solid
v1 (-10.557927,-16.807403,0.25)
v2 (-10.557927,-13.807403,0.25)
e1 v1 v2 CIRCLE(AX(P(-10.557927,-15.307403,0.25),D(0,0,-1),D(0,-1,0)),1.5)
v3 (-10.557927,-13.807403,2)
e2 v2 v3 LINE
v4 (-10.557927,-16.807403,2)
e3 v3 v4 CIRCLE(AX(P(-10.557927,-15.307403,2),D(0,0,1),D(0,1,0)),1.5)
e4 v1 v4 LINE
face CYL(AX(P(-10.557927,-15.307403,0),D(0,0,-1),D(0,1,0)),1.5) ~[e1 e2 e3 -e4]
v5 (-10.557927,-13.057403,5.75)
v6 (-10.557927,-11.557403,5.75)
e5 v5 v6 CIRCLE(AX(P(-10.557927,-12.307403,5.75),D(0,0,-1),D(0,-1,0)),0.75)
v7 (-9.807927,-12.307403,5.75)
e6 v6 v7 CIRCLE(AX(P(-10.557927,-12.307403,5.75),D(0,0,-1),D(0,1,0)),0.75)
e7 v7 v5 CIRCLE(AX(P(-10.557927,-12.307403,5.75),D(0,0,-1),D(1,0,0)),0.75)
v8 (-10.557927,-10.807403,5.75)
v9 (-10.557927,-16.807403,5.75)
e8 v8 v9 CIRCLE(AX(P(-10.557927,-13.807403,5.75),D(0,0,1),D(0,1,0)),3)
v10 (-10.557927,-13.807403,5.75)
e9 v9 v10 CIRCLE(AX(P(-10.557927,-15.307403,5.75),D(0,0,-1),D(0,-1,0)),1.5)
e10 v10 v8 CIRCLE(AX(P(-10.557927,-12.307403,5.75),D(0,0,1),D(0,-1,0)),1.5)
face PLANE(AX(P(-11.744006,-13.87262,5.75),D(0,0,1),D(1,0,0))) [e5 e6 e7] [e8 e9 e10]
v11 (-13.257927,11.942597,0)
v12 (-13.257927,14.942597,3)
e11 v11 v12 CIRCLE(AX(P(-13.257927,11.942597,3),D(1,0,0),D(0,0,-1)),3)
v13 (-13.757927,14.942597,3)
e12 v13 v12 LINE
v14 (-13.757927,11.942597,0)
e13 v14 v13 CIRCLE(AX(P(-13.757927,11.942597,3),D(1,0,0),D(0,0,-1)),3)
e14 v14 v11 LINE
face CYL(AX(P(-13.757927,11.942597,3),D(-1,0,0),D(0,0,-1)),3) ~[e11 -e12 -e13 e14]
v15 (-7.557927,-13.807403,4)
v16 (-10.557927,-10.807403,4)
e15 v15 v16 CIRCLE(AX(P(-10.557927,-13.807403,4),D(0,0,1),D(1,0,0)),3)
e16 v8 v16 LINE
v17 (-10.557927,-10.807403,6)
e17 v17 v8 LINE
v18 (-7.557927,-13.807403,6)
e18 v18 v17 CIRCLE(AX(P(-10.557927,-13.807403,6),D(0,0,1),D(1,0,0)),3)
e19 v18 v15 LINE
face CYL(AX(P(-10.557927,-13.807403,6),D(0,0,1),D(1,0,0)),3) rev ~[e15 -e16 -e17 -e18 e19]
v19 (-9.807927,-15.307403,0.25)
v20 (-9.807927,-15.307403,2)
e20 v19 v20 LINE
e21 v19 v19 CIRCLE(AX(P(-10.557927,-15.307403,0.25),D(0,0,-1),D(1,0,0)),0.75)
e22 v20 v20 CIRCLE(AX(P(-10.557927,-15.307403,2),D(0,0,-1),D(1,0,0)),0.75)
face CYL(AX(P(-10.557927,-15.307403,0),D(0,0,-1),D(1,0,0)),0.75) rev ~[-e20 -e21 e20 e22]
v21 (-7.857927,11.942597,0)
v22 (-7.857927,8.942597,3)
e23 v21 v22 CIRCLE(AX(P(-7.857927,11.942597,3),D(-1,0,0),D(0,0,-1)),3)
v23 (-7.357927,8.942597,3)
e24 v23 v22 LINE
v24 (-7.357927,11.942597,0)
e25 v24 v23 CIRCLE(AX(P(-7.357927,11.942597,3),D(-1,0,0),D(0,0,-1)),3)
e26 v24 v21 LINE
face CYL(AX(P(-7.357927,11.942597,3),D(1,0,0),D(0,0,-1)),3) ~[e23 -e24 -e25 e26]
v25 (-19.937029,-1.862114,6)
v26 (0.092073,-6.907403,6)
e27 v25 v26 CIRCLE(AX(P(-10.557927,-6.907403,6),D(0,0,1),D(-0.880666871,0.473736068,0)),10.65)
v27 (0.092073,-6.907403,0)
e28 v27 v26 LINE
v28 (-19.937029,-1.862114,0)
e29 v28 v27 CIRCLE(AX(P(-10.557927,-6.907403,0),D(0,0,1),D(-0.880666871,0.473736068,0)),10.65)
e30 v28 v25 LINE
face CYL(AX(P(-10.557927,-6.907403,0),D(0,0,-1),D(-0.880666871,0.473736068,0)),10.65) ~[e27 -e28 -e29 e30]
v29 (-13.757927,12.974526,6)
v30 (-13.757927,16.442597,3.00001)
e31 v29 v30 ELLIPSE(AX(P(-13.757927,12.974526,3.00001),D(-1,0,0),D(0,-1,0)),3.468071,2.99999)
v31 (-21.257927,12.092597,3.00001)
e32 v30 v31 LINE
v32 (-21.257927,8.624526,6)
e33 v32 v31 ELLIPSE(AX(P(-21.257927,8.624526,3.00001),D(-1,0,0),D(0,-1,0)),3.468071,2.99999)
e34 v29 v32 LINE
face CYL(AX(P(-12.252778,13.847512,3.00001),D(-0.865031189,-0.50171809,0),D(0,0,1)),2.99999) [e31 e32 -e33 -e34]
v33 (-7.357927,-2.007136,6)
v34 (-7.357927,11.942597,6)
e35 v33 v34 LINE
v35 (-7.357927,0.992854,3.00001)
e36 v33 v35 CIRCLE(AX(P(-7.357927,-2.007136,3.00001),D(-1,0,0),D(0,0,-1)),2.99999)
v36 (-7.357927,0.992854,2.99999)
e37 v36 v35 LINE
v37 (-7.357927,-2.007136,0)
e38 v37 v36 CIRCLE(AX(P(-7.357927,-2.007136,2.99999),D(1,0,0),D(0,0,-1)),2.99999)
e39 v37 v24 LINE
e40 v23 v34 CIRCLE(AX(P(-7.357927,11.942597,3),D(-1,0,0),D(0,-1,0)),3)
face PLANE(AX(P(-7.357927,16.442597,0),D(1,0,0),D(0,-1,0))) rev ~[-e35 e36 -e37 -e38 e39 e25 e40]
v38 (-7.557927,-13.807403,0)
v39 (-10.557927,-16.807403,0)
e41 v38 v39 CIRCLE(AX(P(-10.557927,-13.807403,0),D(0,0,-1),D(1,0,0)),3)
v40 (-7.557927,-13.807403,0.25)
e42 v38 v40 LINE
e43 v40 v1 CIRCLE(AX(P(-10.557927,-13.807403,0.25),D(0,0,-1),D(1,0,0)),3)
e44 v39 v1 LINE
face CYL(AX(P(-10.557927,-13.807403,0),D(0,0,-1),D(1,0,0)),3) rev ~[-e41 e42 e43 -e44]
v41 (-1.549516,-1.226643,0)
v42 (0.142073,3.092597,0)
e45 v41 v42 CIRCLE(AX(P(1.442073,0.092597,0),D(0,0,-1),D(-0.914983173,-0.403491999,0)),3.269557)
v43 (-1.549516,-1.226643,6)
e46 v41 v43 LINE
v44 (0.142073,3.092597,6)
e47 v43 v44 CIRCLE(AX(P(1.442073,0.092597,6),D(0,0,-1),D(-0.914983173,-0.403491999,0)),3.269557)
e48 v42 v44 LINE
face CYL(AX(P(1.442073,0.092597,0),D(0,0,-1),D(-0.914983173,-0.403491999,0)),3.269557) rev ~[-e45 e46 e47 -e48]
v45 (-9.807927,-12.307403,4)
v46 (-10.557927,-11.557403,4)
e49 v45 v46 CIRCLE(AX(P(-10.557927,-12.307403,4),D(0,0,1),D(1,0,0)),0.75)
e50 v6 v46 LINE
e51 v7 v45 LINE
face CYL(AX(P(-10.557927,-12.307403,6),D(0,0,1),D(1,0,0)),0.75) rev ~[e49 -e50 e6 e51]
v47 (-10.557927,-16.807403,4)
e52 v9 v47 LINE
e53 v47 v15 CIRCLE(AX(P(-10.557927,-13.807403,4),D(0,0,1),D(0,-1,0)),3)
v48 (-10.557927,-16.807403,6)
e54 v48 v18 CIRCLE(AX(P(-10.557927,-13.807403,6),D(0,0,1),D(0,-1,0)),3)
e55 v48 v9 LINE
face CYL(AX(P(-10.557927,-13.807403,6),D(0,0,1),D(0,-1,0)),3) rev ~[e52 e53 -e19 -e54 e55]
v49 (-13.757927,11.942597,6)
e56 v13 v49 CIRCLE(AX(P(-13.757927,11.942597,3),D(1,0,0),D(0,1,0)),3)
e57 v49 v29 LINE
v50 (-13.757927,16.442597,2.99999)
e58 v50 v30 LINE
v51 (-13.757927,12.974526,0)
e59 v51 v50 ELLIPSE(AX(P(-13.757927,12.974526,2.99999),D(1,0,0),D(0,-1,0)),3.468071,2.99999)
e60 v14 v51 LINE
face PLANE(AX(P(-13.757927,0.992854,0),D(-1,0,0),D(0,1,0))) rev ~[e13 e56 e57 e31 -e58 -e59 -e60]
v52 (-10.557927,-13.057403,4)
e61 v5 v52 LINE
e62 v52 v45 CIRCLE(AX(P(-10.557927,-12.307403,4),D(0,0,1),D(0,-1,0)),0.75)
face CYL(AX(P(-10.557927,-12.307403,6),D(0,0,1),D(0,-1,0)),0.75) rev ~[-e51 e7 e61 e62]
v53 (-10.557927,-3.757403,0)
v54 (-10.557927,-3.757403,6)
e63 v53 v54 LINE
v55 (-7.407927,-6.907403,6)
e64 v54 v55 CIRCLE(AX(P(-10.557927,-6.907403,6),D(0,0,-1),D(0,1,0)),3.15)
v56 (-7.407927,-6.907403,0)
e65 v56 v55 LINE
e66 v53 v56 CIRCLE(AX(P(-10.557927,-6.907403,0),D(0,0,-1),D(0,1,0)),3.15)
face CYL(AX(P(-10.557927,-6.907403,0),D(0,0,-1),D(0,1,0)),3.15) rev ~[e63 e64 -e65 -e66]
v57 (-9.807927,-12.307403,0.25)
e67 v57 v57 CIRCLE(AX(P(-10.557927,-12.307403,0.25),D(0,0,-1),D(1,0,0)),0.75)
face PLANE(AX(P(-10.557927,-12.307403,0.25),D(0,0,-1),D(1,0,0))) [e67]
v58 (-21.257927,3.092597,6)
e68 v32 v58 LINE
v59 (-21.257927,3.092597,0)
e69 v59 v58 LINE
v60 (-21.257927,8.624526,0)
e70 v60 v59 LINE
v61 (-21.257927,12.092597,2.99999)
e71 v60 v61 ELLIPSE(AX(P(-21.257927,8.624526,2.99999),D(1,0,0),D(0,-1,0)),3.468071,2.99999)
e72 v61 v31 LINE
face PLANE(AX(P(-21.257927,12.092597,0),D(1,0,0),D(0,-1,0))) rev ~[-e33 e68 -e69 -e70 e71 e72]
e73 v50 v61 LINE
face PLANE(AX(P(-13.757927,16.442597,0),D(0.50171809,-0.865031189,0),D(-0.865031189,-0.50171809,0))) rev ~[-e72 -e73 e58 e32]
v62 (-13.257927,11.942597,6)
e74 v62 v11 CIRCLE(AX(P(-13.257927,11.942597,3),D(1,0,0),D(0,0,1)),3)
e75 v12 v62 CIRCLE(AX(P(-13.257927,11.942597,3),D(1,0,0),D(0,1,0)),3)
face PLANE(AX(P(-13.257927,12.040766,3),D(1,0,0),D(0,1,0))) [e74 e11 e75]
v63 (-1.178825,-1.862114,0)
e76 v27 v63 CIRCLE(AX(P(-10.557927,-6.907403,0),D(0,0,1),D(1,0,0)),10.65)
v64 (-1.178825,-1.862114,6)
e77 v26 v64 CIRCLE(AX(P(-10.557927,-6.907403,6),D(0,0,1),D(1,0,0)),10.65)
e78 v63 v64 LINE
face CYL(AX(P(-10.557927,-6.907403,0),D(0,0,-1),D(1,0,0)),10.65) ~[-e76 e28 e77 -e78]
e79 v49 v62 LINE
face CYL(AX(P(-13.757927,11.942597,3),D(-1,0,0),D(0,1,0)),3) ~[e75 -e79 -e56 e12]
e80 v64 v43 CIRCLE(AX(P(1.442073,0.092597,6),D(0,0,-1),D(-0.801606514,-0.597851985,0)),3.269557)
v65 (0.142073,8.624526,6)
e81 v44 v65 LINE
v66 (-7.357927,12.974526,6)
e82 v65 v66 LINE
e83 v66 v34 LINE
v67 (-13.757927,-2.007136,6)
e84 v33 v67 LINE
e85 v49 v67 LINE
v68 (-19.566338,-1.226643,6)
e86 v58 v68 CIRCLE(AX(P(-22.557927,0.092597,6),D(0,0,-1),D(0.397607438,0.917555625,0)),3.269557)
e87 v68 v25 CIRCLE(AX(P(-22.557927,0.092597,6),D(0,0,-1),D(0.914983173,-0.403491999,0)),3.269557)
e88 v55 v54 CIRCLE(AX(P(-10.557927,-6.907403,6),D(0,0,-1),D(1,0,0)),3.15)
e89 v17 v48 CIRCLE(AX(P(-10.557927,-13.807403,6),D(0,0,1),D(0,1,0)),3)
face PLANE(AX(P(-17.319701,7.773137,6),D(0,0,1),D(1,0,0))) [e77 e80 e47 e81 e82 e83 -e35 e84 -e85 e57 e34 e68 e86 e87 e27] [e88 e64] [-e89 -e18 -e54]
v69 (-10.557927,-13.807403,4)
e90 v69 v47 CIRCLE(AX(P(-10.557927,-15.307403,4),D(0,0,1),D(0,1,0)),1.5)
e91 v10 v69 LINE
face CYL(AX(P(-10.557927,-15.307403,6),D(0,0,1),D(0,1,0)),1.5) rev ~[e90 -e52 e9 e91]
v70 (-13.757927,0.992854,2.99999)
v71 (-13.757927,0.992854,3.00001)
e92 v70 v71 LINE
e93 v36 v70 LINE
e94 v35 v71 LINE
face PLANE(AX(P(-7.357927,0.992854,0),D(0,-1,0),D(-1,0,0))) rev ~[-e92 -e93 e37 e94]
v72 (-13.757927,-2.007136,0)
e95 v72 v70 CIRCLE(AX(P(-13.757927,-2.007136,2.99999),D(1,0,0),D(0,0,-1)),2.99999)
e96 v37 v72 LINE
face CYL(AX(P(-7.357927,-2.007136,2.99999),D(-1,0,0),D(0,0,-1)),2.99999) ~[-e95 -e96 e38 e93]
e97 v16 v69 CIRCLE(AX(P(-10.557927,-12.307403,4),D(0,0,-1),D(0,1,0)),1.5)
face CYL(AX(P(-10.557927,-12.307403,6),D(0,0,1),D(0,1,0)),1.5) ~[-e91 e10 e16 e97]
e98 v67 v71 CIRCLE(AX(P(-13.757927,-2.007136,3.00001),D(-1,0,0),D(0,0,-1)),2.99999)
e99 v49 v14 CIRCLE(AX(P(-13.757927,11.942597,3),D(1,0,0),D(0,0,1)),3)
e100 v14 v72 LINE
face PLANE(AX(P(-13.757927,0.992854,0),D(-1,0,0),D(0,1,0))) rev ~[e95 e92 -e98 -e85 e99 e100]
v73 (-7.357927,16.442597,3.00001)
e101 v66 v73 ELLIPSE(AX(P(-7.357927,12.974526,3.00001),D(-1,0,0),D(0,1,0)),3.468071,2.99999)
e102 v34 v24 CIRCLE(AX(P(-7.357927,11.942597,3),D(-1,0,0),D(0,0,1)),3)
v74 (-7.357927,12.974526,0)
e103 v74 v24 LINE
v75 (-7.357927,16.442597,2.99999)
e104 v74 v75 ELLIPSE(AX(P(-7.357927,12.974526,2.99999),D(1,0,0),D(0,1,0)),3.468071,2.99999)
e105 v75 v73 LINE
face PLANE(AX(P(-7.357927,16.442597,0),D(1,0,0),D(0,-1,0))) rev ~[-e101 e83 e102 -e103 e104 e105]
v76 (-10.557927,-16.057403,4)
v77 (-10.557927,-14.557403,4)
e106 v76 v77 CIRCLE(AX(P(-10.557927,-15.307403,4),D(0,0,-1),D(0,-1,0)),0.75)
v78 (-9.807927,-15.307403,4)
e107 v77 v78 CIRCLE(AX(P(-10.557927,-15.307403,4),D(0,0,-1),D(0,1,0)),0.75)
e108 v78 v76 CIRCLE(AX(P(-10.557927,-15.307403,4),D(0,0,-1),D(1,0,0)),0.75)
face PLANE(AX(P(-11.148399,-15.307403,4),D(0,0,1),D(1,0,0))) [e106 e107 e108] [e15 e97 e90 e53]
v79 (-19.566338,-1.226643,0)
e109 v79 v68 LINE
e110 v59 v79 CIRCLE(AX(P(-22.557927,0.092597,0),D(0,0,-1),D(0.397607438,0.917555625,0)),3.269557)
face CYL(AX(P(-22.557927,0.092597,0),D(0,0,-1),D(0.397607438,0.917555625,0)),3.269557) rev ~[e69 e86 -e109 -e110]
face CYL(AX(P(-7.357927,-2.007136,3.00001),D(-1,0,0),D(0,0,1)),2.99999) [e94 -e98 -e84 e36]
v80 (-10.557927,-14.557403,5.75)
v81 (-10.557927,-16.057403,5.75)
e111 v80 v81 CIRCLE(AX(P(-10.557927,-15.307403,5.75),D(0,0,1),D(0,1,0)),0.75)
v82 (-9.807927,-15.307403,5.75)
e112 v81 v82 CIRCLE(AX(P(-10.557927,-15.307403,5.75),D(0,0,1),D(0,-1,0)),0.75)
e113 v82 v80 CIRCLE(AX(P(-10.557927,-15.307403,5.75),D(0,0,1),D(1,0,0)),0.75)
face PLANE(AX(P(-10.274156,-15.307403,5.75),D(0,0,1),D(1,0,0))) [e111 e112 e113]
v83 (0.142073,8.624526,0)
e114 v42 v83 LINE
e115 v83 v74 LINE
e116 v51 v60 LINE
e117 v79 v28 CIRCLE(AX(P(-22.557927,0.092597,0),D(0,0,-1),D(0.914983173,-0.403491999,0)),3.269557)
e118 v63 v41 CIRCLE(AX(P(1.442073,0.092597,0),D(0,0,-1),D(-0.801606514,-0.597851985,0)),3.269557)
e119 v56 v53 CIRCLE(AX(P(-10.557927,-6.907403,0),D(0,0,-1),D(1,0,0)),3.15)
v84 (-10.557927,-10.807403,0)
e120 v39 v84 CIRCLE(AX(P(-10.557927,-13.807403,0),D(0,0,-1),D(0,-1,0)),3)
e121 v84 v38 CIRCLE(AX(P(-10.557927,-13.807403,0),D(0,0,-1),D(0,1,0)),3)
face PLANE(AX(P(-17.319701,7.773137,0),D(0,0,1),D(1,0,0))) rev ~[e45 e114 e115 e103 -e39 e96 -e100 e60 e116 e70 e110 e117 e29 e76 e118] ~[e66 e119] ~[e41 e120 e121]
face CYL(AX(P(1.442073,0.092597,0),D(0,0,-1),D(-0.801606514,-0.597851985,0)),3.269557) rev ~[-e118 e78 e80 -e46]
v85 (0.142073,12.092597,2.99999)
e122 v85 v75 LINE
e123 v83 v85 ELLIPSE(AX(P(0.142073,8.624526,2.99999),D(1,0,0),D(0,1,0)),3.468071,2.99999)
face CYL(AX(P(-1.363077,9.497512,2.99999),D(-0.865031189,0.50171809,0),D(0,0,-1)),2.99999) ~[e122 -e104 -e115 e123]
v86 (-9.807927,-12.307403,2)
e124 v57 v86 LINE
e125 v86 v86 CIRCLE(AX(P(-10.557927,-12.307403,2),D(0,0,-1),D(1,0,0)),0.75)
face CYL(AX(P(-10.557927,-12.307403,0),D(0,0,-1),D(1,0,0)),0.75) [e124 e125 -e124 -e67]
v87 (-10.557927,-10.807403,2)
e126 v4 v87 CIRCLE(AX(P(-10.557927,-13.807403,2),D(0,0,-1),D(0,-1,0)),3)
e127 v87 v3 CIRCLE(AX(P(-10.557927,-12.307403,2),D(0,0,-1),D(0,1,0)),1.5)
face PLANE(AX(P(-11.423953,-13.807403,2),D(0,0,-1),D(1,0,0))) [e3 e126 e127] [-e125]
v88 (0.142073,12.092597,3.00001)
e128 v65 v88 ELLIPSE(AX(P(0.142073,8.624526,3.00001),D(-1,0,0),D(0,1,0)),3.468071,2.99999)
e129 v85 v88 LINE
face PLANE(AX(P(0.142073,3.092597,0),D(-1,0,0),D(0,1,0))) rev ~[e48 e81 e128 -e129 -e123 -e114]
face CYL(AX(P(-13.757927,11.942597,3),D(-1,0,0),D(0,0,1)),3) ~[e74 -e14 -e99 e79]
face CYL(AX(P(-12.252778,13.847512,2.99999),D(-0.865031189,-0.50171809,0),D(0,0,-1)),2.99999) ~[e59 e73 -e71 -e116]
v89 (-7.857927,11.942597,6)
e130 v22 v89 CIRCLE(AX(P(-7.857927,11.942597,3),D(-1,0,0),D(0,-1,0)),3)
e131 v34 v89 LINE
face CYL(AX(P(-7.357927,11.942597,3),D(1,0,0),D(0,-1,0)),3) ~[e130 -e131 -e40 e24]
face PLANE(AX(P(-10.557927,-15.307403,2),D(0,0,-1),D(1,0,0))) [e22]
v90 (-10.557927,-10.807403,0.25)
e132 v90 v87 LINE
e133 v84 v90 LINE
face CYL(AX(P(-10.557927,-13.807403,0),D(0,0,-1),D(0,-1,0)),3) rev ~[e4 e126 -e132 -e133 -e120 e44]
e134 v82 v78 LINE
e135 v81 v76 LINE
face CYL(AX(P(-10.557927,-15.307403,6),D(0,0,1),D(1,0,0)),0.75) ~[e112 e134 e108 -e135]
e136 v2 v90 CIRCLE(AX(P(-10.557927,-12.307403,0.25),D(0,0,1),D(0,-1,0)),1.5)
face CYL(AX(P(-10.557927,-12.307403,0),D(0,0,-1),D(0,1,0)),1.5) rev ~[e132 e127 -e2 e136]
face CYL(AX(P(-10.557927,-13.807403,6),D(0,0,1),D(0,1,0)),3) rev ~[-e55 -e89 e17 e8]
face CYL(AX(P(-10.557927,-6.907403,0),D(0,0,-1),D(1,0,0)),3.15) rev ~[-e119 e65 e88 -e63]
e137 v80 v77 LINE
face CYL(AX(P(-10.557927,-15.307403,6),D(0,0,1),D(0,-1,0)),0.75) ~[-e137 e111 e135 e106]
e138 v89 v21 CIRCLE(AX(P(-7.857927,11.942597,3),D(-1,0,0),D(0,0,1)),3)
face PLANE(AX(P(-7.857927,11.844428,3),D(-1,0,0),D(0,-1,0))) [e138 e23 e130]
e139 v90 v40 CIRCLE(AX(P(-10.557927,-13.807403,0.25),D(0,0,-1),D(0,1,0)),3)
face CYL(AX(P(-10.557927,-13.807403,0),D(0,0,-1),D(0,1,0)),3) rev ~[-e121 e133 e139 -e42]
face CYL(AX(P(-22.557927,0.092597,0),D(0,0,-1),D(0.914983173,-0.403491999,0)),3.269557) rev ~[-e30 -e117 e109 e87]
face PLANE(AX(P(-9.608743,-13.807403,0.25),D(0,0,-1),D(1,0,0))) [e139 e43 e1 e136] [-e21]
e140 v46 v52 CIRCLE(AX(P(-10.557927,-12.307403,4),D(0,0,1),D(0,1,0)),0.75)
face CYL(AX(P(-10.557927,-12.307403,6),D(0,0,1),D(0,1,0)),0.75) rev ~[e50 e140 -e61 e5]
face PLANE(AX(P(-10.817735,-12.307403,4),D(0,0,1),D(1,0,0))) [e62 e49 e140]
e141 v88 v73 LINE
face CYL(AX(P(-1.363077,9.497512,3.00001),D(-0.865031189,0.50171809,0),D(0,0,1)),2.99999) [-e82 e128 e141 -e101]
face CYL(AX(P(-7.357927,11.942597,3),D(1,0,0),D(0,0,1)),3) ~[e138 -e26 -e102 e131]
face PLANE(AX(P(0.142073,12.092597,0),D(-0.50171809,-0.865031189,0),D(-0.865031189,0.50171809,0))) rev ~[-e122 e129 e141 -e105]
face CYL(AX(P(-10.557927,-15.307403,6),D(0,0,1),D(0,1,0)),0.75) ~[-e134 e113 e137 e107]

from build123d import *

# Parameters (mm, degrees)
F1_DEPTH  = 6
F3_DEPTH  = 0.5
F5_DEPTH  = 0.5
F6_R      = 2.99999
F7_R      = 2.99999
F9_DEPTH  = 2
F10_DEPTH = 0.25
F11_R     = 0.75
F12_DEPTH = 2
F13_DEPTH = 0.25


# Not quite as in the source:
# - a fillet or chamfer is up to 0.001 mm smaller than in the source, because OpenCascade refuses the exact size


with BuildPart() as f1:
    # F0 (on Top) → F1 (new body)
    with BuildSketch(Plane.XY):
        with BuildLine():
            ThreePointArc((-21.257927263, 3.0925971456), (-19.5135237331, 1.2849088277), (-19.5663380414, -1.2266427602))
            ThreePointArc((-19.5663380414, -1.2266427602), (-17.0596555887, 1.5276447909), (-13.757927263, 3.2504758611))
            Line((-13.757927263, 3.2504758611), (-13.757927263, 16.4425971456))
            Line((-13.757927263, 16.4425971456), (-21.257927263, 12.0925971456))
            Line((-21.257927263, 12.0925971456), (-21.257927263, 3.0925971456))
        make_face()
        with BuildLine():
            ThreePointArc((-19.937029438, -1.8621137259), (-13.1593751133, -17.2347921219), (0.092072737, -6.9074028544))
            ThreePointArc((0.092072737, -6.9074028544), (-0.2305379955, -4.3059550041), (-1.178825088, -1.8621137259))
            ThreePointArc((-1.178825088, -1.8621137259), (-1.3821012217, -1.5548376637), (-1.5495164847, -1.2266427602))
            ThreePointArc((-1.5495164847, -1.2266427602), (-4.0561989374, 1.5276447909), (-7.357927263, 3.2504758611))
            Line((-7.357927263, 3.2504758611), (-7.357927263, 1.1925971456))
            Line((-7.357927263, 1.1925971456), (-7.357927263, 0.9928541258))
            Line((-7.357927263, 0.9928541258), (-10.557927263, 0.9928541258))
            Line((-10.557927263, 0.9928541258), (-13.757927263, 0.9928541258))
            Line((-13.757927263, 0.9928541258), (-13.757927263, 1.1925971456))
            Line((-13.757927263, 1.1925971456), (-13.757927263, 3.2504758611))
            ThreePointArc((-13.757927263, 3.2504758611), (-17.0596555887, 1.5276447909), (-19.5663380414, -1.2266427602))
            ThreePointArc((-19.5663380414, -1.2266427602), (-19.7337533043, -1.5548376637), (-19.937029438, -1.8621137259))
        make_face()
        with BuildLine():
            ThreePointArc((-7.407927263, -6.9074028544), (-12.7853136237, -9.1347892152), (-10.557927263, -3.7574028544))
            ThreePointArc((-10.557927263, -3.7574028544), (-8.3305409023, -4.6800164937), (-7.407927263, -6.9074028544))
        make_face(mode=Mode.SUBTRACT)
        with BuildLine():
            ThreePointArc((-7.357927263, 3.2504758611), (-4.0561989374, 1.5276447909), (-1.5495164847, -1.2266427602))
            ThreePointArc((-1.5495164847, -1.2266427602), (-1.6023307929, 1.2849088277), (0.142072737, 3.0925971456))
            Line((0.142072737, 3.0925971456), (0.142072737, 12.0925971456))
            Line((0.142072737, 12.0925971456), (-7.357927263, 16.4425971456))
            Line((-7.357927263, 16.4425971456), (-7.357927263, 3.2504758611))
        make_face()
    extrude(amount=F1_DEPTH)

    # F2 (on face) → F3 (join)
    with BuildSketch(Plane.YZ.offset(-13.757927263)):
        with BuildLine():
            ThreePointArc((11.9425971456, 0), (14.0639174891, 0.8786796564), (14.9425971456, 3))
            ThreePointArc((14.9425971456, 3), (14.0639174891, 5.1213203436), (11.9425971456, 6))
            ThreePointArc((11.9425971456, 6), (8.9425971456, 3), (11.9425971456, 0))
        make_face()
    extrude(amount=F3_DEPTH)

    # F4 (on face) → F5 (join)
    with BuildSketch(Plane(origin=(-7.357927263, 0, 0), x_dir=(0, -1, 0), z_dir=(-1, 0, 0))):
        with BuildLine():
            ThreePointArc((-11.9425971456, 0), (-9.821276802, 0.8786796564), (-8.9425971456, 3))
            ThreePointArc((-8.9425971456, 3), (-9.821276802, 5.1213203436), (-11.9425971456, 6))
            ThreePointArc((-11.9425971456, 6), (-14.9425971456, 3), (-11.9425971456, 0))
        make_face()
    extrude(amount=F5_DEPTH)

    # F6 (radius 3 in the source; OpenCascade refuses exactly that, so slightly less here)
    f6_edges = [f1.edges().sort_by_distance(p)[0] for p in [
        (-10.557927, 0.992854, 0),
        (-10.557927, 0.992854, 6),
    ]]
    fillet(f6_edges, radius=F6_R)

    # F7 (radius 3 in the source; OpenCascade refuses exactly that, so slightly less here)
    f7_edges = [f1.edges().sort_by_distance(p)[0] for p in [
        (-3.607927, 14.267597, 6),
        (-3.607927, 14.267597, 0),
        (-17.507927, 14.267597, 6),
        (-17.507927, 14.267597, 0),
    ]]
    fillet(f7_edges, radius=F7_R)

    # F8 (on face) → F9 (cut)
    with BuildSketch(Plane.XY.offset(6)):
        with BuildLine():
            ThreePointArc((-10.557927263, -13.8074028544), (-12.057927263, -15.3074028544), (-10.557927263, -16.8074028544))
            Line((-10.557927263, -16.8074028544), (-10.557927263, -16.0574028544))
            ThreePointArc((-10.557927263, -16.0574028544), (-11.307927263, -15.3074028544), (-10.557927263, -14.5574028544))
            Line((-10.557927263, -14.5574028544), (-10.557927263, -13.8074028544))
        make_face()
        with BuildLine():
            ThreePointArc((-7.557927263, -13.8074028544), (-8.4366069195, -11.6860825109), (-10.557927263, -10.8074028544))
            ThreePointArc((-10.557927263, -10.8074028544), (-9.057927263, -12.3074028544), (-10.557927263, -13.8074028544))
            Line((-10.557927263, -13.8074028544), (-10.557927263, -14.5574028544))
            ThreePointArc((-10.557927263, -14.5574028544), (-10.0275971771, -14.7770727685), (-9.807927263, -15.3074028544))
            ThreePointArc((-9.807927263, -15.3074028544), (-10.0275971771, -15.8377329403), (-10.557927263, -16.0574028544))
            Line((-10.557927263, -16.0574028544), (-10.557927263, -16.8074028544))
            ThreePointArc((-10.557927263, -16.8074028544), (-8.4366069195, -15.928723198), (-7.557927263, -13.8074028544))
        make_face()
        with BuildLine():
            Line((-10.557927263, -13.0574028544), (-10.557927263, -11.5574028544))
            ThreePointArc((-10.557927263, -11.5574028544), (-11.307927263, -12.3074028544), (-10.557927263, -13.0574028544))
        make_face()
        with BuildLine():
            ThreePointArc((-9.807927263, -12.3074028544), (-10.0275971771, -11.7770727685), (-10.557927263, -11.5574028544))
            Line((-10.557927263, -11.5574028544), (-10.557927263, -13.0574028544))
            ThreePointArc((-10.557927263, -13.0574028544), (-10.0275971771, -12.8377329403), (-9.807927263, -12.3074028544))
        make_face()
    extrude(amount=-F9_DEPTH, mode=Mode.SUBTRACT)

    # F8 (on face) → F10 (cut)
    with BuildSketch(Plane.XY.offset(6)):
        with BuildLine():
            Line((-10.557927263, -11.5574028544), (-10.557927263, -10.8074028544))
            ThreePointArc((-10.557927263, -10.8074028544), (-13.557927263, -13.8074028544), (-10.557927263, -16.8074028544))
            ThreePointArc((-10.557927263, -16.8074028544), (-12.057927263, -15.3074028544), (-10.557927263, -13.8074028544))
            Line((-10.557927263, -13.8074028544), (-10.557927263, -13.0574028544))
            ThreePointArc((-10.557927263, -13.0574028544), (-11.307927263, -12.3074028544), (-10.557927263, -11.5574028544))
        make_face()
        with BuildLine():
            ThreePointArc((-10.557927263, -13.8074028544), (-9.057927263, -12.3074028544), (-10.557927263, -10.8074028544))
            Line((-10.557927263, -10.8074028544), (-10.557927263, -11.5574028544))
            ThreePointArc((-10.557927263, -11.5574028544), (-10.0275971771, -11.7770727685), (-9.807927263, -12.3074028544))
            ThreePointArc((-9.807927263, -12.3074028544), (-10.0275971771, -12.8377329403), (-10.557927263, -13.0574028544))
            Line((-10.557927263, -13.0574028544), (-10.557927263, -13.8074028544))
        make_face()
        with BuildLine():
            Line((-10.557927263, -14.5574028544), (-10.557927263, -16.0574028544))
            ThreePointArc((-10.557927263, -16.0574028544), (-10.0275971771, -15.8377329403), (-9.807927263, -15.3074028544))
            ThreePointArc((-9.807927263, -15.3074028544), (-10.0275971771, -14.7770727685), (-10.557927263, -14.5574028544))
        make_face()
        with BuildLine():
            ThreePointArc((-10.557927263, -14.5574028544), (-11.307927263, -15.3074028544), (-10.557927263, -16.0574028544))
            Line((-10.557927263, -16.0574028544), (-10.557927263, -14.5574028544))
        make_face()
    extrude(amount=-F10_DEPTH, mode=Mode.SUBTRACT)

    # F11 (on face) → F12 (cut)
    with BuildSketch(Plane(origin=(0, 0, 0), x_dir=(1, 0, 0), z_dir=(0, 0, -1))):
        with BuildLine():
            ThreePointArc((-10.557927263, 13.8074028544), (-12.057927263, 15.3074028544), (-10.557927263, 16.8074028544))
            ThreePointArc((-10.557927263, 16.8074028544), (-13.557927263, 13.8074028544), (-10.557927263, 10.8074028544))
            ThreePointArc((-10.557927263, 10.8074028544), (-9.057927263, 12.3074028544), (-10.557927263, 13.8074028544))
        make_face()
        with Locations((-10.557927263, 12.3074028544)):
            Circle(F11_R, mode=Mode.SUBTRACT)
        with Locations((-10.557927263, 15.3074028544)):
            Circle(F11_R)
    extrude(amount=-F12_DEPTH, mode=Mode.SUBTRACT)

    # F11 (on face) → F13 (cut)
    with BuildSketch(Plane(origin=(0, 0, 0), x_dir=(1, 0, 0), z_dir=(0, 0, -1))):
        with BuildLine():
            ThreePointArc((-10.557927263, 10.8074028544), (-8.4366069195, 11.6860825109), (-7.557927263, 13.8074028544))
            ThreePointArc((-7.557927263, 13.8074028544), (-8.4366069195, 15.928723198), (-10.557927263, 16.8074028544))
            ThreePointArc((-10.557927263, 16.8074028544), (-12.057927263, 15.3074028544), (-10.557927263, 13.8074028544))
            ThreePointArc((-10.557927263, 13.8074028544), (-9.057927263, 12.3074028544), (-10.557927263, 10.8074028544))
        make_face()
        with Locations((-10.557927263, 15.3074028544)):
            Circle(F11_R, mode=Mode.SUBTRACT)
        with Locations((-10.557927263, 12.3074028544)):
            Circle(F11_R)
    extrude(amount=-F13_DEPTH, mode=Mode.SUBTRACT)


solid = f1.part
